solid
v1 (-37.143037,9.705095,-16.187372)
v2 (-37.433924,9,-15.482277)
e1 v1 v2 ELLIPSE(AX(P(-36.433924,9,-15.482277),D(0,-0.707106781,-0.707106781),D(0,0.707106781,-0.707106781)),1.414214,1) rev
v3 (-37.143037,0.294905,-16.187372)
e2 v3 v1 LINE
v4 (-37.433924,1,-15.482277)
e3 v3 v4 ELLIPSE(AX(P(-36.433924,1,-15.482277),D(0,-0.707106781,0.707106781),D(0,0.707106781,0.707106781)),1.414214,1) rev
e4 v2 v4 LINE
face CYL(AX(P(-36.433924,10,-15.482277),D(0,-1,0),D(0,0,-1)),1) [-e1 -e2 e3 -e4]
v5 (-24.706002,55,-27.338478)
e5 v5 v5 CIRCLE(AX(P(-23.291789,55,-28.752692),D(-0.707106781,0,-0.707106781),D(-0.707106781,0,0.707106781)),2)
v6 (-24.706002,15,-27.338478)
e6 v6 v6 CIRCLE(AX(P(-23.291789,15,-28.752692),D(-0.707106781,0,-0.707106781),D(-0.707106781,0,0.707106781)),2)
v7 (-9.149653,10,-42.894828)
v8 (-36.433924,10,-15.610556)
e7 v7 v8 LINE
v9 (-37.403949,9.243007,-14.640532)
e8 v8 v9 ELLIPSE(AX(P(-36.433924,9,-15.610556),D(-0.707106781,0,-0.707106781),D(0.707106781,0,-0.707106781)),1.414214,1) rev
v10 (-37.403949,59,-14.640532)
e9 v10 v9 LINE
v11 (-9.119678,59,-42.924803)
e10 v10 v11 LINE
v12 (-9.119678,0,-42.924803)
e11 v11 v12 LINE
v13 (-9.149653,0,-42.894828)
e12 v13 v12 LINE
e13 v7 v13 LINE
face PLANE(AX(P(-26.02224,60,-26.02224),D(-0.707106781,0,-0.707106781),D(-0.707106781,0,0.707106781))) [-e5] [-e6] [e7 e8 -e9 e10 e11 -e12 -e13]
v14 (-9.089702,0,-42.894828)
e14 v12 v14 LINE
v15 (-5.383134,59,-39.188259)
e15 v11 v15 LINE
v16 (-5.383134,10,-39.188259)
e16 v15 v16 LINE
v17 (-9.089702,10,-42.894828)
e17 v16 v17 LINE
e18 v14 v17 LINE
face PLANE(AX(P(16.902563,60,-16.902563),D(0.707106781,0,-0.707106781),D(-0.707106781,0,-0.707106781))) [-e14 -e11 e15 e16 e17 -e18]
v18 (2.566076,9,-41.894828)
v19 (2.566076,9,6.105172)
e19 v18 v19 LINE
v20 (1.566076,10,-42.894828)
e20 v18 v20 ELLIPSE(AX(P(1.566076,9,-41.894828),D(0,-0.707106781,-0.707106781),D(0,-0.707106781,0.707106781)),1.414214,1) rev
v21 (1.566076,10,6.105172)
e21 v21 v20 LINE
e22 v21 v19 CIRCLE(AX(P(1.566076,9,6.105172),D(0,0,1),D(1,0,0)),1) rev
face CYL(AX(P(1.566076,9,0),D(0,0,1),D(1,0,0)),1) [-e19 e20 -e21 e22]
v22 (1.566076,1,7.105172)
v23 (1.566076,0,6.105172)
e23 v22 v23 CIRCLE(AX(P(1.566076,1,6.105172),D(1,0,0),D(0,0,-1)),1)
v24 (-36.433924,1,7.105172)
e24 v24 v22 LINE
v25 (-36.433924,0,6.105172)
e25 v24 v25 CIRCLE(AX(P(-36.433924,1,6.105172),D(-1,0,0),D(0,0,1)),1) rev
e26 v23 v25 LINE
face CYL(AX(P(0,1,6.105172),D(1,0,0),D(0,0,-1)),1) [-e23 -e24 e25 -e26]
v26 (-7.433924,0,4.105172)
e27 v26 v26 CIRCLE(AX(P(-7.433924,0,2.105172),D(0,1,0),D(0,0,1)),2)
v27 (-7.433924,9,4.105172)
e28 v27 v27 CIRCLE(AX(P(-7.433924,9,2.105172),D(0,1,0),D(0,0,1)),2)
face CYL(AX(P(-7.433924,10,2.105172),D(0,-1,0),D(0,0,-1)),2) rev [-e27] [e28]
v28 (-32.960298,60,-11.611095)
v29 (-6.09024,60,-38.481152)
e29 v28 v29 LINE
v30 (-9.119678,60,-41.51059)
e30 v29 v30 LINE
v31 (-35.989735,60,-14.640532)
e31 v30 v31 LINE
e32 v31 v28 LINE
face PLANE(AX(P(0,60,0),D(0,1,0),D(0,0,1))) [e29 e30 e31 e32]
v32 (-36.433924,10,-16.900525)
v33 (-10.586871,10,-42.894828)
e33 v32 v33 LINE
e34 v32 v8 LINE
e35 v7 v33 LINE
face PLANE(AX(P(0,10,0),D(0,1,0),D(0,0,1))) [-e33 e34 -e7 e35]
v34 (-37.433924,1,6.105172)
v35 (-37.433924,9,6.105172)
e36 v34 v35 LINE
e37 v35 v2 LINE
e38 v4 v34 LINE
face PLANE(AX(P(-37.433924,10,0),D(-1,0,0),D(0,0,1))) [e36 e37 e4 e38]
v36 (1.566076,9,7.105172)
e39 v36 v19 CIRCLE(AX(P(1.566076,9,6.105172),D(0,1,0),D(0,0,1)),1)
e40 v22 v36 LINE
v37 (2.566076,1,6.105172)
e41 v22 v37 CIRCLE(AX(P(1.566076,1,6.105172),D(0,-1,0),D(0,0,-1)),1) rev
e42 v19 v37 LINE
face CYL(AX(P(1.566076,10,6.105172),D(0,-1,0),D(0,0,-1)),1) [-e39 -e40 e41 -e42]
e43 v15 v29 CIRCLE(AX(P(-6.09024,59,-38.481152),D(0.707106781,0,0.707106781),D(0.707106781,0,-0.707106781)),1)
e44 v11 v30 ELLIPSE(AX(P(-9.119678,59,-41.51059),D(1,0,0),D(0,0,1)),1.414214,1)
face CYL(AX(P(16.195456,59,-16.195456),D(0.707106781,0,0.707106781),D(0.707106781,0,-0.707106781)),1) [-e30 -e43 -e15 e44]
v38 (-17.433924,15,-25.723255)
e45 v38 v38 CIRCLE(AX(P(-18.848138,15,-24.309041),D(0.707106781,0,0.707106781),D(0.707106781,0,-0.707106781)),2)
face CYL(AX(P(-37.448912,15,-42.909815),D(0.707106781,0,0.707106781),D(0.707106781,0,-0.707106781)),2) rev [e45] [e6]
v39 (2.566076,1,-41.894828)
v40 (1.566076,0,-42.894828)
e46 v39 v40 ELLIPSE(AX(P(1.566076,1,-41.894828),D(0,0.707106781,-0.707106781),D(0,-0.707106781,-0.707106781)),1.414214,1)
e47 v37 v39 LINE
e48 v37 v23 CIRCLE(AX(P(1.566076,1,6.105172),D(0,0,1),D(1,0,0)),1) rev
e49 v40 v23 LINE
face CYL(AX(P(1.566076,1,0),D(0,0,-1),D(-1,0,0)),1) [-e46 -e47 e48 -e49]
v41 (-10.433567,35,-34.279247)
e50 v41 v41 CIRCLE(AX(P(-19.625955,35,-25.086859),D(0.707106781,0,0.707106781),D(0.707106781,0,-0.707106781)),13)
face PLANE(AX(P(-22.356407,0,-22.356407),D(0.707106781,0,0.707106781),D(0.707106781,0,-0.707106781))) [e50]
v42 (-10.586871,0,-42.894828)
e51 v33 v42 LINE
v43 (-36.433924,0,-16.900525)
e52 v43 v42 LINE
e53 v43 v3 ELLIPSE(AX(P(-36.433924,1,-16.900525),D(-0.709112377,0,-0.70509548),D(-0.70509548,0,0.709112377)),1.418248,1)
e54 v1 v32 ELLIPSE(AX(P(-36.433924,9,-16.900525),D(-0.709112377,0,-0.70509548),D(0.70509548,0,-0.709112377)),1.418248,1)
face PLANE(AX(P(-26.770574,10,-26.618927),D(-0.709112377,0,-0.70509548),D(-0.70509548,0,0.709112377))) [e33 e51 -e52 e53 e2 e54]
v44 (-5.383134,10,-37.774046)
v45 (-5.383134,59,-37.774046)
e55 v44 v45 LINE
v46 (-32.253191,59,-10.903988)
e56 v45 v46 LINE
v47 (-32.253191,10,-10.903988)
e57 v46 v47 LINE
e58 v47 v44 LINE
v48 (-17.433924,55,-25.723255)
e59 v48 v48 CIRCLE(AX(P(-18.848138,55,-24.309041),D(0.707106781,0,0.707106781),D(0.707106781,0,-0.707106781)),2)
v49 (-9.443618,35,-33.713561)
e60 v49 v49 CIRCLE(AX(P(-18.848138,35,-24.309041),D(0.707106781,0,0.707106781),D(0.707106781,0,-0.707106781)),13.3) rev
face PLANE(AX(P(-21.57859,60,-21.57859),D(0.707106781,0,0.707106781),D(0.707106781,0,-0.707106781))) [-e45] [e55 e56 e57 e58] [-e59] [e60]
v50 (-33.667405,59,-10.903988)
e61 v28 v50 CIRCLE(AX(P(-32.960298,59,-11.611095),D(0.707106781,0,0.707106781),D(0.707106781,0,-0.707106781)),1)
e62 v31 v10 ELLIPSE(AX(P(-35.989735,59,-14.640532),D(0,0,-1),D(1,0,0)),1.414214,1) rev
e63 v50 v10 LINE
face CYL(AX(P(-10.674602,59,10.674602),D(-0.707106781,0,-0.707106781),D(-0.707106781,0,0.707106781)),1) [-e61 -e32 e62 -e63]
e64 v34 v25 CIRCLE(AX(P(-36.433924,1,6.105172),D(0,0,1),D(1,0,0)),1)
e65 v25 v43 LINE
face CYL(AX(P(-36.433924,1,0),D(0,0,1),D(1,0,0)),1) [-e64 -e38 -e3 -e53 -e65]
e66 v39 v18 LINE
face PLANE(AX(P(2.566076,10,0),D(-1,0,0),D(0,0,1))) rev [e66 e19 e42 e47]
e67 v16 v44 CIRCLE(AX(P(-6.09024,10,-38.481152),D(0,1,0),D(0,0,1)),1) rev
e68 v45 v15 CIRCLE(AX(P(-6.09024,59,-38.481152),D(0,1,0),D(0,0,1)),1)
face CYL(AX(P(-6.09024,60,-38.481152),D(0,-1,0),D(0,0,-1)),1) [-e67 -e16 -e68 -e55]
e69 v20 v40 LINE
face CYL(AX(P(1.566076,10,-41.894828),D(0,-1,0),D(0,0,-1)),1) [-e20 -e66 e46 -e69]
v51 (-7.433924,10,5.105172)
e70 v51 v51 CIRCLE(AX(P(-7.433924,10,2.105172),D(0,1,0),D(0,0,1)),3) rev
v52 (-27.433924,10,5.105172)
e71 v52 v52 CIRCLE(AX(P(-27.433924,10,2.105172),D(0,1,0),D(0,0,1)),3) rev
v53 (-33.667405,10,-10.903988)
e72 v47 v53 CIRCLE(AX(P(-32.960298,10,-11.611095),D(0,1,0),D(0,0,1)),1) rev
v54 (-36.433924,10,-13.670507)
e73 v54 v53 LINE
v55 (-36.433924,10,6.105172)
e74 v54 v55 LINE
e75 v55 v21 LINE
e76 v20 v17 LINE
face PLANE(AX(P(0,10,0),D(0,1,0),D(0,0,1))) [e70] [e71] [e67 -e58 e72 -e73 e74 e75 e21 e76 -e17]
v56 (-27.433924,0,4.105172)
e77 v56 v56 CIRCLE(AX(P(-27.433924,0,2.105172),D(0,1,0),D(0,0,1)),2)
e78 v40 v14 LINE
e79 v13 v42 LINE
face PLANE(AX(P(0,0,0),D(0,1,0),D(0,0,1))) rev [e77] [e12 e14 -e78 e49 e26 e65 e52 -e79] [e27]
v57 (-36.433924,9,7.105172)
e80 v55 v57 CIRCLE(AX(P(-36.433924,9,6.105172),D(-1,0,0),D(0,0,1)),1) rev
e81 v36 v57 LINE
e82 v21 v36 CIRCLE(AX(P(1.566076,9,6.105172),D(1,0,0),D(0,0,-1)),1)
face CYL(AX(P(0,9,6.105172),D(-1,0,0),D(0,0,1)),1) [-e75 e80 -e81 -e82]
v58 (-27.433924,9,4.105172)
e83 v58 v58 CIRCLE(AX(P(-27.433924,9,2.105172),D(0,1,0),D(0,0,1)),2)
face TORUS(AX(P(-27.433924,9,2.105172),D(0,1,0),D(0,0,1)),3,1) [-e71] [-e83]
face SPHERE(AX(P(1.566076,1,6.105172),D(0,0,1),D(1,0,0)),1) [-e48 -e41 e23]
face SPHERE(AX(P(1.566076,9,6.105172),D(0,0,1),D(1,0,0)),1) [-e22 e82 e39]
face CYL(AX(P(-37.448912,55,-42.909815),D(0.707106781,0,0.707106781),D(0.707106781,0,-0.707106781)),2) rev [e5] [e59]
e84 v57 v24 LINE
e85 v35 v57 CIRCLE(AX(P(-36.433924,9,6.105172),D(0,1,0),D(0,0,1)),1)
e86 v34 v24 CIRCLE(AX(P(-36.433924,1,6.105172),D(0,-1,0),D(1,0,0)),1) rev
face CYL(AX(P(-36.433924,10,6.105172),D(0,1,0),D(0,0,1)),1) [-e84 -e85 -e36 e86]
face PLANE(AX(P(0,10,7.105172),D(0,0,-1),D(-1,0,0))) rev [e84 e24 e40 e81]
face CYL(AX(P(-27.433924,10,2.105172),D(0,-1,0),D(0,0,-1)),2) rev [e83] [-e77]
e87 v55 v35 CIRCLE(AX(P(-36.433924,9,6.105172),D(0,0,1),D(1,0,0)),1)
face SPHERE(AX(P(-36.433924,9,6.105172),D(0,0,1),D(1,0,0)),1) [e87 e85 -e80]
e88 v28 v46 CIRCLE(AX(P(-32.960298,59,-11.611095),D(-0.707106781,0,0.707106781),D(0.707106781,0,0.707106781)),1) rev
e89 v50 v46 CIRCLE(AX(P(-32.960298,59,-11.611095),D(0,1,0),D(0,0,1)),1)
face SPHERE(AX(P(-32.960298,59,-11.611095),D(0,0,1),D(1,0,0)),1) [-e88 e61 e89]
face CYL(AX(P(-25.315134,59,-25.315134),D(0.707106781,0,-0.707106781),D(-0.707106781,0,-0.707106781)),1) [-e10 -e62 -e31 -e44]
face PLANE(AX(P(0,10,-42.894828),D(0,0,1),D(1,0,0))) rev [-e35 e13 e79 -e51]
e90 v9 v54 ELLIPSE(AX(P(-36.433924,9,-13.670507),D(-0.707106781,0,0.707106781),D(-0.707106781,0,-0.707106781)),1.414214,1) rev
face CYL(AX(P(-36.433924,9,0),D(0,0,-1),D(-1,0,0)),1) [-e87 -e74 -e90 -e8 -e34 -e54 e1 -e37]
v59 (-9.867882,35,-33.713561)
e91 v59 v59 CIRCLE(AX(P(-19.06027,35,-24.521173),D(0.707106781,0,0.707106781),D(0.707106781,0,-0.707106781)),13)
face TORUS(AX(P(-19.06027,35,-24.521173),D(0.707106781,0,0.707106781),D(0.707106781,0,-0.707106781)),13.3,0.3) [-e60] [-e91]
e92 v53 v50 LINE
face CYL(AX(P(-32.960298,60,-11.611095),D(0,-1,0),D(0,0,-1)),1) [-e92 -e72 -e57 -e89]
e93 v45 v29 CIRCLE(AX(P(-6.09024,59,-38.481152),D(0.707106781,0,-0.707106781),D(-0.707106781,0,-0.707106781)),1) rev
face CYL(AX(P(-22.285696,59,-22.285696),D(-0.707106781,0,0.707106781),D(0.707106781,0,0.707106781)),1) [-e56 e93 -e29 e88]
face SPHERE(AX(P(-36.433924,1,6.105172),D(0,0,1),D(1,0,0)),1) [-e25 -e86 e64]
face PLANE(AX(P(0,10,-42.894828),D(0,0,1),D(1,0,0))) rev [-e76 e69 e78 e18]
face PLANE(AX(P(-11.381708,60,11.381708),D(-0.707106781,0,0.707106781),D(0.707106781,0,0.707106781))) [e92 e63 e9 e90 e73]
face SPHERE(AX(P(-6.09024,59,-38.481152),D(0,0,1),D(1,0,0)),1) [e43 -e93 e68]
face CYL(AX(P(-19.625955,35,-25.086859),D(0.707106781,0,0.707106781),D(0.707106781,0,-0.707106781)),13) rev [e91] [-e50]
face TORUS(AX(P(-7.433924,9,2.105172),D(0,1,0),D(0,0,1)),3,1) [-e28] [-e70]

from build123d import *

# Parameters (mm, degrees)
SKETCH_1_R          = 2
EXTRUDE_1_DEPTH     = 10
EXTRUDE_2_DEPTH     = 60
SKETCH_2_R          = 13
CUT_EXTRUDE_1_DEPTH = 1.1
FILLET_1_R          = 0.3
FILLET_2_R          = 1
SKETCH_2_3_R        = 2
CUT_EXTRUDE_2_DEPTH = 71.751134663


with BuildPart() as part:
    # 草图1 → 凸台-拉伸1 (new body)
    with BuildSketch(Plane(origin=(0, 0, 0), x_dir=(1, 0, 0), z_dir=(0, 1, 0))):
        Polygon((2.566075632, 42.89482758), (-10.586870806, 42.89482758), (-37.433924368, 15.89482758), (-37.433924368, -7.10517242), (-17.433924368, -7.10517242), (2.566075632, -7.10517242), align=None)
        with Locations(Location((-27.433924368, -2.10517242, 0), (0, 0, 270))):
            Circle(SKETCH_1_R, mode=Mode.SUBTRACT)
        with Locations(Location((-7.433924368, -2.10517242, 0), (0, 0, 270))):
            Circle(SKETCH_1_R, mode=Mode.SUBTRACT)
    extrude(amount=EXTRUDE_1_DEPTH)

    # 草图1<3> → 凸台-拉伸2 (add)
    with BuildSketch(Plane(origin=(0, 0, 0), x_dir=(1, 0, 0), z_dir=(0, 1, 0))):
        Polygon((-32.960298008, 10.196881065), (-37.403948822, 14.640531879), (-23.261813198, 28.782667503), (-9.119677574, 42.924803127), (-4.67602676, 38.481152313), align=None)
        Polygon((-9.149653121, 42.89482758), (-23.261813198, 28.782667503), (-37.403948822, 14.640531879), (-32.960298008, 10.196881065), (-4.67602676, 38.481152313), (-9.089702028, 42.89482758), align=None)
    extrude(amount=EXTRUDE_2_DEPTH)

    # 草图2 → 切除-拉伸1 (cut)
    with BuildSketch(Plane(origin=(-21.578589537, 0, -21.578589537), x_dir=(0.7071067811865472, 0, -0.7071067811865478), z_dir=(0.7071067811865478, 0, 0.7071067811865472))):
        with Locations((3.861441693, 35)):
            Circle(SKETCH_2_R)
    extrude(amount=-CUT_EXTRUDE_1_DEPTH, mode=Mode.SUBTRACT)

    # 圆角1
    fillet_1_edges = [part.edges().sort_by_distance(p)[0] for p in [
        (-28.040526086, 35, -15.116652987),
    ]]
    fillet(fillet_1_edges, radius=FILLET_1_R)

    # 圆角2
    # the kernel refuses this fillet: 1 mm, written as the material it takes off along each edge
    with BuildSketch(Plane(origin=(-36.433924368, 1, 6.10517242), x_dir=(-1, 0, 0), z_dir=(0, -1, 0))) as fillet_2_piece_1_section:
        Polygon((0, 0), (FILLET_2_R, 0), (FILLET_2_R, -FILLET_2_R), (0, -FILLET_2_R), align=None)
    fillet_2_piece_1 = extrude(amount=FILLET_2_R, mode=Mode.PRIVATE)
    fillet_2_piece_1 = fillet_2_piece_1 - Plane(origin=(-36.433924368, 1, 6.10517242), x_dir=(0.7071067811865475, 0, -0.7071067811865475), z_dir=(0, -1, 0)) * Sphere(FILLET_2_R, mode=Mode.PRIVATE)
    add(fillet_2_piece_1, mode=Mode.SUBTRACT)
    with BuildSketch(Plane(origin=(1.566075632, 1, 6.10517242), x_dir=(1, 0, 0), z_dir=(0, -1, 0))) as fillet_2_piece_2_section:
        Polygon((0, 0), (FILLET_2_R, 0), (FILLET_2_R, FILLET_2_R), (0, FILLET_2_R), align=None)
    fillet_2_piece_2 = extrude(amount=FILLET_2_R, mode=Mode.PRIVATE)
    fillet_2_piece_2 = fillet_2_piece_2 - Plane(origin=(1.566075632, 1, 6.10517242), x_dir=(-0.7071067811865475, 0, -0.7071067811865475), z_dir=(0, -1, 0)) * Sphere(FILLET_2_R, mode=Mode.PRIVATE)
    add(fillet_2_piece_2, mode=Mode.SUBTRACT)
    with BuildSketch(Plane(origin=(-36.433924368, 9, 6.10517242), x_dir=(0, 1, 0), z_dir=(-1, 0, 0))) as fillet_2_piece_3_section:
        Polygon((0, 0), (FILLET_2_R, 0), (FILLET_2_R, -FILLET_2_R), (0, -FILLET_2_R), align=None)
    fillet_2_piece_3 = extrude(amount=FILLET_2_R, mode=Mode.PRIVATE)
    fillet_2_piece_3 = fillet_2_piece_3 - Plane(origin=(-36.433924368, 9, 6.10517242), x_dir=(0, -0.7071067811865475, -0.7071067811865475), z_dir=(-1, 0, 0)) * Sphere(FILLET_2_R, mode=Mode.PRIVATE)
    add(fillet_2_piece_3, mode=Mode.SUBTRACT)
    with BuildSketch(Plane(origin=(1.566075632, 9, 6.10517242), x_dir=(1, 0, 0), z_dir=(0, 1, 0))) as fillet_2_piece_4_section:
        Polygon((0, 0), (FILLET_2_R, 0), (FILLET_2_R, -FILLET_2_R), (0, -FILLET_2_R), align=None)
    fillet_2_piece_4 = extrude(amount=FILLET_2_R, mode=Mode.PRIVATE)
    fillet_2_piece_4 = fillet_2_piece_4 - Plane(origin=(1.566075632, 9, 6.10517242), x_dir=(-0.7071067811865475, 0, -0.7071067811865475), z_dir=(0, 1, 0)) * Sphere(FILLET_2_R, mode=Mode.PRIVATE)
    add(fillet_2_piece_4, mode=Mode.SUBTRACT)
    with BuildSketch(Plane(origin=(-6.090240323, 59, -38.481152313), x_dir=(0.7071067811865481, 0, -0.707106781186547), z_dir=(0.7071067811865475, 0, 0.7071067811865476))) as fillet_2_piece_5_section:
        Polygon((0, 0), (FILLET_2_R, 0), (FILLET_2_R, FILLET_2_R), (0, FILLET_2_R), align=None)
    fillet_2_piece_5 = extrude(amount=FILLET_2_R, mode=Mode.PRIVATE)
    fillet_2_piece_5 = fillet_2_piece_5 - Plane(origin=(-6.090240323, 59, -38.481152313), x_dir=(-0.5000000000000004, -0.7071067811865475, 0.4999999999999996), z_dir=(0.7071067811865475, 0, 0.7071067811865476)) * Sphere(FILLET_2_R, mode=Mode.PRIVATE)
    add(fillet_2_piece_5, mode=Mode.SUBTRACT)
    with BuildSketch(Plane(origin=(-32.960298008, 59, -11.611094628), x_dir=(-0.707106781186548, 0, 0.7071067811865471), z_dir=(0.7071067811865475, 0, 0.7071067811865476))) as fillet_2_piece_6_section:
        Polygon((0, 0), (FILLET_2_R, 0), (FILLET_2_R, -FILLET_2_R), (0, -FILLET_2_R), align=None)
    fillet_2_piece_6 = extrude(amount=FILLET_2_R, mode=Mode.PRIVATE)
    fillet_2_piece_6 = fillet_2_piece_6 - Plane(origin=(-32.960298008, 59, -11.611094628), x_dir=(0.5000000000000003, -0.7071067811865475, -0.49999999999999967), z_dir=(0.7071067811865475, 0, 0.7071067811865476)) * Sphere(FILLET_2_R, mode=Mode.PRIVATE)
    add(fillet_2_piece_6, mode=Mode.SUBTRACT)
    with BuildSketch(Plane(origin=(-7.433924368, 10, 2.10517242), x_dir=(0, 0, 1), z_dir=(-1, 0, 0))) as fillet_2_piece_7:
        with BuildLine():
            CenterArc((2 + FILLET_2_R, -FILLET_2_R), FILLET_2_R, 90, 90)
            Line((2, -FILLET_2_R), (2, 0))
            Line((2, 0), (2 + FILLET_2_R, 0))
        make_face()
    revolve(axis=Axis((-7.433924368, 10, 2.10517242), (0, 1, 0)), mode=Mode.SUBTRACT)
    with BuildSketch(Plane(origin=(-36.433924368, 0, 7.10517242), x_dir=(0, 1, 0), z_dir=(1, 0, 0)), Plane(origin=(-5.383133542, 60, -37.774045532), x_dir=(0, -1, 0), z_dir=(-0.7071067811865476, 0, 0.7071067811865475))) as fillet_2_piece_8:
        with BuildLine():
            CenterArc((FILLET_2_R, -FILLET_2_R), FILLET_2_R, 90, 90)
            Line((0, -FILLET_2_R), (0, 0))
            Line((0, 0), (FILLET_2_R, 0))
        make_face()
    extrude(amount=38, mode=Mode.SUBTRACT)
    with BuildSketch(Plane(origin=(-37.433924368, 0, -18.39482758), x_dir=(0, 1, 0), z_dir=(0, 0, 1))) as fillet_2_piece_9:
        with BuildLine():
            CenterArc((FILLET_2_R, -FILLET_2_R), FILLET_2_R, 90, 90)
            Line((0, -FILLET_2_R), (0, 0))
            Line((0, 0), (FILLET_2_R, 0))
        make_face()
    extrude(amount=24.5, mode=Mode.SUBTRACT)
    with BuildSketch(Plane(origin=(-37.433924368, 10, -18.39482758), x_dir=(1, 0, 0), z_dir=(0, 0, 1))) as fillet_2_piece_10_section:
        with BuildLine():
            CenterArc((FILLET_2_R, -FILLET_2_R), FILLET_2_R, 90, 90)
            Line((0, -FILLET_2_R), (0, 0))
            Line((0, 0), (FILLET_2_R, 0))
        make_face()
    fillet_2_piece_10 = extrude(amount=24.5, mode=Mode.PRIVATE)
    fillet_2_piece_10 = split(fillet_2_piece_10, bisect_by=Plane(origin=(-36.324921122, 9.766519009, -15.719559578), z_dir=(-0.7071067811865477, 0, -0.7071067811865474)), keep=Keep.TOP, mode=Mode.PRIVATE)
    fillet_2_piece_10 = split(fillet_2_piece_10, bisect_by=Plane(origin=(-38.299035866, 9.766519009, -15.535618924), z_dir=(0.707106781186548, 0, -0.7071067811865471)), keep=Keep.TOP, mode=Mode.PRIVATE)
    add(fillet_2_piece_10, mode=Mode.SUBTRACT)
    with BuildSketch(Plane(origin=(-37.433924368, 10, -18.39482758), x_dir=(1, 0, 0), z_dir=(0, 0, 1))) as fillet_2_piece_11_section:
        with BuildLine():
            CenterArc((FILLET_2_R, -FILLET_2_R), FILLET_2_R, 90, 90)
            Line((0, -FILLET_2_R), (0, 0))
            Line((0, 0), (FILLET_2_R, 0))
        make_face()
    fillet_2_piece_11 = extrude(amount=24.5, mode=Mode.PRIVATE)
    fillet_2_piece_11 = split(fillet_2_piece_11, bisect_by=Plane(origin=(-37.42099653, 9.530875179, -14.623484171), z_dir=(-0.7071067811865477, 0, -0.7071067811865474)), keep=Keep.TOP, mode=Mode.PRIVATE)
    fillet_2_piece_11 = split(fillet_2_piece_11, bisect_by=Plane(origin=(-37.42099653, 9.530875179, -14.657579587), z_dir=(-0.707106781186548, 0, 0.7071067811865471)), keep=Keep.TOP, mode=Mode.PRIVATE)
    add(fillet_2_piece_11, mode=Mode.SUBTRACT)
    with BuildSketch(Plane(origin=(-37.433924368, 10, -18.39482758), x_dir=(1, 0, 0), z_dir=(0, 0, 1))) as fillet_2_piece_12_section:
        with BuildLine():
            CenterArc((FILLET_2_R, -FILLET_2_R), FILLET_2_R, 90, 90)
            Line((0, -FILLET_2_R), (0, 0))
            Line((0, 0), (FILLET_2_R, 0))
        make_face()
    fillet_2_piece_12 = extrude(amount=24.5, mode=Mode.PRIVATE)
    fillet_2_piece_12 = split(fillet_2_piece_12, bisect_by=Plane(origin=(-42.544211764, 9.772380765, -9.500268936), z_dir=(0.7071067811865477, 0, 0.7071067811865474)), keep=Keep.TOP, mode=Mode.PRIVATE)
    fillet_2_piece_12 = split(fillet_2_piece_12, bisect_by=Plane(origin=(-32.069422105, 9.772380765, -9.306005163), z_dir=(-0.707106781186548, 0, 0.7071067811865471)), keep=Keep.TOP, mode=Mode.PRIVATE)
    add(fillet_2_piece_12, mode=Mode.SUBTRACT)
    with BuildSketch(Plane(origin=(-37.433924368, -1.03137671, -15.89482758), x_dir=(0, 0, 1), z_dir=(0, 1, 0))) as fillet_2_piece_13:
        with BuildLine():
            CenterArc((FILLET_2_R * 0.412550684114, FILLET_2_R), FILLET_2_R, 225.162741715, 44.837258285)
            Line((-FILLET_2_R * 0.29254479632, FILLET_2_R * 0.290887622818), (0, 0))
            Line((0, 0), (FILLET_2_R * 0.412550684114, 0))
        make_face()
    extrude(amount=12.062753421, mode=Mode.SUBTRACT)
    with BuildSketch(Plane(origin=(2.566075632, -2.5, -42.89482758), x_dir=(-1, 0, 0), z_dir=(0, 1, 0))) as fillet_2_piece_14:
        with BuildLine():
            CenterArc((FILLET_2_R, FILLET_2_R), FILLET_2_R, 180, 90)
            Line((0, FILLET_2_R), (0, 0))
            Line((0, 0), (FILLET_2_R, 0))
        make_face()
    extrude(amount=15, mode=Mode.SUBTRACT)
    with BuildSketch(Plane(origin=(2.566075632, 1, 7.10517242), x_dir=(-1, 0, 0), z_dir=(0, 1, 0))) as fillet_2_piece_15:
        with BuildLine():
            CenterArc((FILLET_2_R, -FILLET_2_R), FILLET_2_R, 90, 90)
            Line((0, -FILLET_2_R), (0, 0))
            Line((0, 0), (FILLET_2_R, 0))
        make_face()
    extrude(amount=8, mode=Mode.SUBTRACT)
    with BuildSketch(Plane(origin=(-37.433924368, 1, 7.10517242), x_dir=(1, 0, 0), z_dir=(0, 1, 0))) as fillet_2_piece_16:
        with BuildLine():
            CenterArc((FILLET_2_R, FILLET_2_R), FILLET_2_R, 180, 90)
            Line((0, FILLET_2_R), (0, 0))
            Line((0, 0), (FILLET_2_R, 0))
        make_face()
    extrude(amount=8, mode=Mode.SUBTRACT)
    with BuildSketch(Plane(origin=(1.566075632, 10, 7.10517242), x_dir=(0, 0, -1), z_dir=(-1, 0, 0))) as fillet_2_piece_17:
        with BuildLine():
            CenterArc((FILLET_2_R, FILLET_2_R), FILLET_2_R, 180, 90)
            Line((0, FILLET_2_R), (0, 0))
            Line((0, 0), (FILLET_2_R, 0))
        make_face()
    extrude(amount=38, mode=Mode.SUBTRACT)
    with BuildSketch(Plane(origin=(2.566075632, 10, 6.10517242), x_dir=(-1, 0, 0), z_dir=(0, 0, -1)), Plane(origin=(2.566075632, 0, 6.10517242), x_dir=(0, 1, 0), z_dir=(0, 0, -1))) as fillet_2_piece_18:
        with BuildLine():
            CenterArc((FILLET_2_R, -FILLET_2_R), FILLET_2_R, 90, 90)
            Line((0, -FILLET_2_R), (0, 0))
            Line((0, 0), (FILLET_2_R, 0))
        make_face()
    extrude(amount=51.5, mode=Mode.SUBTRACT)
    with BuildSketch(Plane(origin=(-5.383133542, 60, -39.188259094), x_dir=(0, -1, 0), z_dir=(-0.707106781186547, 0, -0.7071067811865481))) as fillet_2_piece_19:
        with BuildLine():
            CenterArc((FILLET_2_R, FILLET_2_R), FILLET_2_R, 180, 90)
            Line((0, FILLET_2_R), (0, 0))
            Line((0, 0), (FILLET_2_R, 0))
        make_face()
    extrude(amount=7.784271247, mode=Mode.SUBTRACT)
    with BuildSketch(Plane(origin=(-4.67602676, 10, -38.481152313), x_dir=(-0.7071067811865467, 0, 0.7071067811865485), z_dir=(0, 1, 0))) as fillet_2_piece_20:
        with BuildLine():
            CenterArc((FILLET_2_R, -FILLET_2_R), FILLET_2_R, 90, 90)
            Line((0, -FILLET_2_R), (0, 0))
            Line((0, 0), (FILLET_2_R, 0))
        make_face()
    extrude(amount=49, mode=Mode.SUBTRACT)
    with BuildSketch(Plane(origin=(-39.171715775, 60, -12.872764926), x_dir=(0.7071067811865477, 0, 0.7071067811865475), z_dir=(0.7071067811865475, 0, -0.7071067811865477))) as fillet_2_piece_21:
        with BuildLine():
            CenterArc((FILLET_2_R, FILLET_2_R), FILLET_2_R, 180, 90)
            Line((0, FILLET_2_R), (0, 0))
            Line((0, 0), (FILLET_2_R, 0))
        make_face()
    extrude(amount=45, mode=Mode.SUBTRACT)
    with BuildSketch(Plane(origin=(-33.667404789, 60, -10.903987846), x_dir=(0, -1, 0), z_dir=(-0.7071067811865471, 0, -0.707106781186548))) as fillet_2_piece_22:
        with BuildLine():
            CenterArc((FILLET_2_R, -FILLET_2_R), FILLET_2_R, 90, 90)
            Line((0, -FILLET_2_R), (0, 0))
            Line((0, 0), (FILLET_2_R, 0))
        make_face()
    extrude(amount=7.784271247, mode=Mode.SUBTRACT)
    with BuildSketch(Plane(origin=(-32.960298008, 10, -10.196881065), x_dir=(0.7071067811865502, 0, -0.7071067811865449), z_dir=(0, 1, 0))) as fillet_2_piece_23:
        with BuildLine():
            CenterArc((FILLET_2_R, FILLET_2_R), FILLET_2_R, 180, 90)
            Line((0, FILLET_2_R), (0, 0))
            Line((0, 0), (FILLET_2_R, 0))
        make_face()
    extrude(amount=49, mode=Mode.SUBTRACT)
    with BuildSketch(Plane(origin=(-27.433924368, 10, 2.10517242), x_dir=(0, 0, 1), z_dir=(-1, 0, 0))) as fillet_2_piece_24:
        with BuildLine():
            CenterArc((2 + FILLET_2_R, -FILLET_2_R), FILLET_2_R, 90, 90)
            Line((2, -FILLET_2_R), (2, 0))
            Line((2, 0), (2 + FILLET_2_R, 0))
        make_face()
    revolve(axis=Axis((-27.433924368, 10, 2.10517242), (0, 1, 0)), mode=Mode.SUBTRACT)

    # 草图2<3> → 切除-拉伸2 (cut, through all)
    with BuildSketch(Plane(origin=(-21.578589537, 0, -21.578589537), x_dir=(0.7071067811865472, 0, -0.7071067811865478), z_dir=(0.7071067811865478, 0, 0.7071067811865472))):
        with Locations((3.861441693, 55)):
            Circle(SKETCH_2_3_R)
        with Locations((3.861441693, 15)):
            Circle(SKETCH_2_3_R)
    extrude(amount=-CUT_EXTRUDE_2_DEPTH, mode=Mode.SUBTRACT)


solid = part.part
